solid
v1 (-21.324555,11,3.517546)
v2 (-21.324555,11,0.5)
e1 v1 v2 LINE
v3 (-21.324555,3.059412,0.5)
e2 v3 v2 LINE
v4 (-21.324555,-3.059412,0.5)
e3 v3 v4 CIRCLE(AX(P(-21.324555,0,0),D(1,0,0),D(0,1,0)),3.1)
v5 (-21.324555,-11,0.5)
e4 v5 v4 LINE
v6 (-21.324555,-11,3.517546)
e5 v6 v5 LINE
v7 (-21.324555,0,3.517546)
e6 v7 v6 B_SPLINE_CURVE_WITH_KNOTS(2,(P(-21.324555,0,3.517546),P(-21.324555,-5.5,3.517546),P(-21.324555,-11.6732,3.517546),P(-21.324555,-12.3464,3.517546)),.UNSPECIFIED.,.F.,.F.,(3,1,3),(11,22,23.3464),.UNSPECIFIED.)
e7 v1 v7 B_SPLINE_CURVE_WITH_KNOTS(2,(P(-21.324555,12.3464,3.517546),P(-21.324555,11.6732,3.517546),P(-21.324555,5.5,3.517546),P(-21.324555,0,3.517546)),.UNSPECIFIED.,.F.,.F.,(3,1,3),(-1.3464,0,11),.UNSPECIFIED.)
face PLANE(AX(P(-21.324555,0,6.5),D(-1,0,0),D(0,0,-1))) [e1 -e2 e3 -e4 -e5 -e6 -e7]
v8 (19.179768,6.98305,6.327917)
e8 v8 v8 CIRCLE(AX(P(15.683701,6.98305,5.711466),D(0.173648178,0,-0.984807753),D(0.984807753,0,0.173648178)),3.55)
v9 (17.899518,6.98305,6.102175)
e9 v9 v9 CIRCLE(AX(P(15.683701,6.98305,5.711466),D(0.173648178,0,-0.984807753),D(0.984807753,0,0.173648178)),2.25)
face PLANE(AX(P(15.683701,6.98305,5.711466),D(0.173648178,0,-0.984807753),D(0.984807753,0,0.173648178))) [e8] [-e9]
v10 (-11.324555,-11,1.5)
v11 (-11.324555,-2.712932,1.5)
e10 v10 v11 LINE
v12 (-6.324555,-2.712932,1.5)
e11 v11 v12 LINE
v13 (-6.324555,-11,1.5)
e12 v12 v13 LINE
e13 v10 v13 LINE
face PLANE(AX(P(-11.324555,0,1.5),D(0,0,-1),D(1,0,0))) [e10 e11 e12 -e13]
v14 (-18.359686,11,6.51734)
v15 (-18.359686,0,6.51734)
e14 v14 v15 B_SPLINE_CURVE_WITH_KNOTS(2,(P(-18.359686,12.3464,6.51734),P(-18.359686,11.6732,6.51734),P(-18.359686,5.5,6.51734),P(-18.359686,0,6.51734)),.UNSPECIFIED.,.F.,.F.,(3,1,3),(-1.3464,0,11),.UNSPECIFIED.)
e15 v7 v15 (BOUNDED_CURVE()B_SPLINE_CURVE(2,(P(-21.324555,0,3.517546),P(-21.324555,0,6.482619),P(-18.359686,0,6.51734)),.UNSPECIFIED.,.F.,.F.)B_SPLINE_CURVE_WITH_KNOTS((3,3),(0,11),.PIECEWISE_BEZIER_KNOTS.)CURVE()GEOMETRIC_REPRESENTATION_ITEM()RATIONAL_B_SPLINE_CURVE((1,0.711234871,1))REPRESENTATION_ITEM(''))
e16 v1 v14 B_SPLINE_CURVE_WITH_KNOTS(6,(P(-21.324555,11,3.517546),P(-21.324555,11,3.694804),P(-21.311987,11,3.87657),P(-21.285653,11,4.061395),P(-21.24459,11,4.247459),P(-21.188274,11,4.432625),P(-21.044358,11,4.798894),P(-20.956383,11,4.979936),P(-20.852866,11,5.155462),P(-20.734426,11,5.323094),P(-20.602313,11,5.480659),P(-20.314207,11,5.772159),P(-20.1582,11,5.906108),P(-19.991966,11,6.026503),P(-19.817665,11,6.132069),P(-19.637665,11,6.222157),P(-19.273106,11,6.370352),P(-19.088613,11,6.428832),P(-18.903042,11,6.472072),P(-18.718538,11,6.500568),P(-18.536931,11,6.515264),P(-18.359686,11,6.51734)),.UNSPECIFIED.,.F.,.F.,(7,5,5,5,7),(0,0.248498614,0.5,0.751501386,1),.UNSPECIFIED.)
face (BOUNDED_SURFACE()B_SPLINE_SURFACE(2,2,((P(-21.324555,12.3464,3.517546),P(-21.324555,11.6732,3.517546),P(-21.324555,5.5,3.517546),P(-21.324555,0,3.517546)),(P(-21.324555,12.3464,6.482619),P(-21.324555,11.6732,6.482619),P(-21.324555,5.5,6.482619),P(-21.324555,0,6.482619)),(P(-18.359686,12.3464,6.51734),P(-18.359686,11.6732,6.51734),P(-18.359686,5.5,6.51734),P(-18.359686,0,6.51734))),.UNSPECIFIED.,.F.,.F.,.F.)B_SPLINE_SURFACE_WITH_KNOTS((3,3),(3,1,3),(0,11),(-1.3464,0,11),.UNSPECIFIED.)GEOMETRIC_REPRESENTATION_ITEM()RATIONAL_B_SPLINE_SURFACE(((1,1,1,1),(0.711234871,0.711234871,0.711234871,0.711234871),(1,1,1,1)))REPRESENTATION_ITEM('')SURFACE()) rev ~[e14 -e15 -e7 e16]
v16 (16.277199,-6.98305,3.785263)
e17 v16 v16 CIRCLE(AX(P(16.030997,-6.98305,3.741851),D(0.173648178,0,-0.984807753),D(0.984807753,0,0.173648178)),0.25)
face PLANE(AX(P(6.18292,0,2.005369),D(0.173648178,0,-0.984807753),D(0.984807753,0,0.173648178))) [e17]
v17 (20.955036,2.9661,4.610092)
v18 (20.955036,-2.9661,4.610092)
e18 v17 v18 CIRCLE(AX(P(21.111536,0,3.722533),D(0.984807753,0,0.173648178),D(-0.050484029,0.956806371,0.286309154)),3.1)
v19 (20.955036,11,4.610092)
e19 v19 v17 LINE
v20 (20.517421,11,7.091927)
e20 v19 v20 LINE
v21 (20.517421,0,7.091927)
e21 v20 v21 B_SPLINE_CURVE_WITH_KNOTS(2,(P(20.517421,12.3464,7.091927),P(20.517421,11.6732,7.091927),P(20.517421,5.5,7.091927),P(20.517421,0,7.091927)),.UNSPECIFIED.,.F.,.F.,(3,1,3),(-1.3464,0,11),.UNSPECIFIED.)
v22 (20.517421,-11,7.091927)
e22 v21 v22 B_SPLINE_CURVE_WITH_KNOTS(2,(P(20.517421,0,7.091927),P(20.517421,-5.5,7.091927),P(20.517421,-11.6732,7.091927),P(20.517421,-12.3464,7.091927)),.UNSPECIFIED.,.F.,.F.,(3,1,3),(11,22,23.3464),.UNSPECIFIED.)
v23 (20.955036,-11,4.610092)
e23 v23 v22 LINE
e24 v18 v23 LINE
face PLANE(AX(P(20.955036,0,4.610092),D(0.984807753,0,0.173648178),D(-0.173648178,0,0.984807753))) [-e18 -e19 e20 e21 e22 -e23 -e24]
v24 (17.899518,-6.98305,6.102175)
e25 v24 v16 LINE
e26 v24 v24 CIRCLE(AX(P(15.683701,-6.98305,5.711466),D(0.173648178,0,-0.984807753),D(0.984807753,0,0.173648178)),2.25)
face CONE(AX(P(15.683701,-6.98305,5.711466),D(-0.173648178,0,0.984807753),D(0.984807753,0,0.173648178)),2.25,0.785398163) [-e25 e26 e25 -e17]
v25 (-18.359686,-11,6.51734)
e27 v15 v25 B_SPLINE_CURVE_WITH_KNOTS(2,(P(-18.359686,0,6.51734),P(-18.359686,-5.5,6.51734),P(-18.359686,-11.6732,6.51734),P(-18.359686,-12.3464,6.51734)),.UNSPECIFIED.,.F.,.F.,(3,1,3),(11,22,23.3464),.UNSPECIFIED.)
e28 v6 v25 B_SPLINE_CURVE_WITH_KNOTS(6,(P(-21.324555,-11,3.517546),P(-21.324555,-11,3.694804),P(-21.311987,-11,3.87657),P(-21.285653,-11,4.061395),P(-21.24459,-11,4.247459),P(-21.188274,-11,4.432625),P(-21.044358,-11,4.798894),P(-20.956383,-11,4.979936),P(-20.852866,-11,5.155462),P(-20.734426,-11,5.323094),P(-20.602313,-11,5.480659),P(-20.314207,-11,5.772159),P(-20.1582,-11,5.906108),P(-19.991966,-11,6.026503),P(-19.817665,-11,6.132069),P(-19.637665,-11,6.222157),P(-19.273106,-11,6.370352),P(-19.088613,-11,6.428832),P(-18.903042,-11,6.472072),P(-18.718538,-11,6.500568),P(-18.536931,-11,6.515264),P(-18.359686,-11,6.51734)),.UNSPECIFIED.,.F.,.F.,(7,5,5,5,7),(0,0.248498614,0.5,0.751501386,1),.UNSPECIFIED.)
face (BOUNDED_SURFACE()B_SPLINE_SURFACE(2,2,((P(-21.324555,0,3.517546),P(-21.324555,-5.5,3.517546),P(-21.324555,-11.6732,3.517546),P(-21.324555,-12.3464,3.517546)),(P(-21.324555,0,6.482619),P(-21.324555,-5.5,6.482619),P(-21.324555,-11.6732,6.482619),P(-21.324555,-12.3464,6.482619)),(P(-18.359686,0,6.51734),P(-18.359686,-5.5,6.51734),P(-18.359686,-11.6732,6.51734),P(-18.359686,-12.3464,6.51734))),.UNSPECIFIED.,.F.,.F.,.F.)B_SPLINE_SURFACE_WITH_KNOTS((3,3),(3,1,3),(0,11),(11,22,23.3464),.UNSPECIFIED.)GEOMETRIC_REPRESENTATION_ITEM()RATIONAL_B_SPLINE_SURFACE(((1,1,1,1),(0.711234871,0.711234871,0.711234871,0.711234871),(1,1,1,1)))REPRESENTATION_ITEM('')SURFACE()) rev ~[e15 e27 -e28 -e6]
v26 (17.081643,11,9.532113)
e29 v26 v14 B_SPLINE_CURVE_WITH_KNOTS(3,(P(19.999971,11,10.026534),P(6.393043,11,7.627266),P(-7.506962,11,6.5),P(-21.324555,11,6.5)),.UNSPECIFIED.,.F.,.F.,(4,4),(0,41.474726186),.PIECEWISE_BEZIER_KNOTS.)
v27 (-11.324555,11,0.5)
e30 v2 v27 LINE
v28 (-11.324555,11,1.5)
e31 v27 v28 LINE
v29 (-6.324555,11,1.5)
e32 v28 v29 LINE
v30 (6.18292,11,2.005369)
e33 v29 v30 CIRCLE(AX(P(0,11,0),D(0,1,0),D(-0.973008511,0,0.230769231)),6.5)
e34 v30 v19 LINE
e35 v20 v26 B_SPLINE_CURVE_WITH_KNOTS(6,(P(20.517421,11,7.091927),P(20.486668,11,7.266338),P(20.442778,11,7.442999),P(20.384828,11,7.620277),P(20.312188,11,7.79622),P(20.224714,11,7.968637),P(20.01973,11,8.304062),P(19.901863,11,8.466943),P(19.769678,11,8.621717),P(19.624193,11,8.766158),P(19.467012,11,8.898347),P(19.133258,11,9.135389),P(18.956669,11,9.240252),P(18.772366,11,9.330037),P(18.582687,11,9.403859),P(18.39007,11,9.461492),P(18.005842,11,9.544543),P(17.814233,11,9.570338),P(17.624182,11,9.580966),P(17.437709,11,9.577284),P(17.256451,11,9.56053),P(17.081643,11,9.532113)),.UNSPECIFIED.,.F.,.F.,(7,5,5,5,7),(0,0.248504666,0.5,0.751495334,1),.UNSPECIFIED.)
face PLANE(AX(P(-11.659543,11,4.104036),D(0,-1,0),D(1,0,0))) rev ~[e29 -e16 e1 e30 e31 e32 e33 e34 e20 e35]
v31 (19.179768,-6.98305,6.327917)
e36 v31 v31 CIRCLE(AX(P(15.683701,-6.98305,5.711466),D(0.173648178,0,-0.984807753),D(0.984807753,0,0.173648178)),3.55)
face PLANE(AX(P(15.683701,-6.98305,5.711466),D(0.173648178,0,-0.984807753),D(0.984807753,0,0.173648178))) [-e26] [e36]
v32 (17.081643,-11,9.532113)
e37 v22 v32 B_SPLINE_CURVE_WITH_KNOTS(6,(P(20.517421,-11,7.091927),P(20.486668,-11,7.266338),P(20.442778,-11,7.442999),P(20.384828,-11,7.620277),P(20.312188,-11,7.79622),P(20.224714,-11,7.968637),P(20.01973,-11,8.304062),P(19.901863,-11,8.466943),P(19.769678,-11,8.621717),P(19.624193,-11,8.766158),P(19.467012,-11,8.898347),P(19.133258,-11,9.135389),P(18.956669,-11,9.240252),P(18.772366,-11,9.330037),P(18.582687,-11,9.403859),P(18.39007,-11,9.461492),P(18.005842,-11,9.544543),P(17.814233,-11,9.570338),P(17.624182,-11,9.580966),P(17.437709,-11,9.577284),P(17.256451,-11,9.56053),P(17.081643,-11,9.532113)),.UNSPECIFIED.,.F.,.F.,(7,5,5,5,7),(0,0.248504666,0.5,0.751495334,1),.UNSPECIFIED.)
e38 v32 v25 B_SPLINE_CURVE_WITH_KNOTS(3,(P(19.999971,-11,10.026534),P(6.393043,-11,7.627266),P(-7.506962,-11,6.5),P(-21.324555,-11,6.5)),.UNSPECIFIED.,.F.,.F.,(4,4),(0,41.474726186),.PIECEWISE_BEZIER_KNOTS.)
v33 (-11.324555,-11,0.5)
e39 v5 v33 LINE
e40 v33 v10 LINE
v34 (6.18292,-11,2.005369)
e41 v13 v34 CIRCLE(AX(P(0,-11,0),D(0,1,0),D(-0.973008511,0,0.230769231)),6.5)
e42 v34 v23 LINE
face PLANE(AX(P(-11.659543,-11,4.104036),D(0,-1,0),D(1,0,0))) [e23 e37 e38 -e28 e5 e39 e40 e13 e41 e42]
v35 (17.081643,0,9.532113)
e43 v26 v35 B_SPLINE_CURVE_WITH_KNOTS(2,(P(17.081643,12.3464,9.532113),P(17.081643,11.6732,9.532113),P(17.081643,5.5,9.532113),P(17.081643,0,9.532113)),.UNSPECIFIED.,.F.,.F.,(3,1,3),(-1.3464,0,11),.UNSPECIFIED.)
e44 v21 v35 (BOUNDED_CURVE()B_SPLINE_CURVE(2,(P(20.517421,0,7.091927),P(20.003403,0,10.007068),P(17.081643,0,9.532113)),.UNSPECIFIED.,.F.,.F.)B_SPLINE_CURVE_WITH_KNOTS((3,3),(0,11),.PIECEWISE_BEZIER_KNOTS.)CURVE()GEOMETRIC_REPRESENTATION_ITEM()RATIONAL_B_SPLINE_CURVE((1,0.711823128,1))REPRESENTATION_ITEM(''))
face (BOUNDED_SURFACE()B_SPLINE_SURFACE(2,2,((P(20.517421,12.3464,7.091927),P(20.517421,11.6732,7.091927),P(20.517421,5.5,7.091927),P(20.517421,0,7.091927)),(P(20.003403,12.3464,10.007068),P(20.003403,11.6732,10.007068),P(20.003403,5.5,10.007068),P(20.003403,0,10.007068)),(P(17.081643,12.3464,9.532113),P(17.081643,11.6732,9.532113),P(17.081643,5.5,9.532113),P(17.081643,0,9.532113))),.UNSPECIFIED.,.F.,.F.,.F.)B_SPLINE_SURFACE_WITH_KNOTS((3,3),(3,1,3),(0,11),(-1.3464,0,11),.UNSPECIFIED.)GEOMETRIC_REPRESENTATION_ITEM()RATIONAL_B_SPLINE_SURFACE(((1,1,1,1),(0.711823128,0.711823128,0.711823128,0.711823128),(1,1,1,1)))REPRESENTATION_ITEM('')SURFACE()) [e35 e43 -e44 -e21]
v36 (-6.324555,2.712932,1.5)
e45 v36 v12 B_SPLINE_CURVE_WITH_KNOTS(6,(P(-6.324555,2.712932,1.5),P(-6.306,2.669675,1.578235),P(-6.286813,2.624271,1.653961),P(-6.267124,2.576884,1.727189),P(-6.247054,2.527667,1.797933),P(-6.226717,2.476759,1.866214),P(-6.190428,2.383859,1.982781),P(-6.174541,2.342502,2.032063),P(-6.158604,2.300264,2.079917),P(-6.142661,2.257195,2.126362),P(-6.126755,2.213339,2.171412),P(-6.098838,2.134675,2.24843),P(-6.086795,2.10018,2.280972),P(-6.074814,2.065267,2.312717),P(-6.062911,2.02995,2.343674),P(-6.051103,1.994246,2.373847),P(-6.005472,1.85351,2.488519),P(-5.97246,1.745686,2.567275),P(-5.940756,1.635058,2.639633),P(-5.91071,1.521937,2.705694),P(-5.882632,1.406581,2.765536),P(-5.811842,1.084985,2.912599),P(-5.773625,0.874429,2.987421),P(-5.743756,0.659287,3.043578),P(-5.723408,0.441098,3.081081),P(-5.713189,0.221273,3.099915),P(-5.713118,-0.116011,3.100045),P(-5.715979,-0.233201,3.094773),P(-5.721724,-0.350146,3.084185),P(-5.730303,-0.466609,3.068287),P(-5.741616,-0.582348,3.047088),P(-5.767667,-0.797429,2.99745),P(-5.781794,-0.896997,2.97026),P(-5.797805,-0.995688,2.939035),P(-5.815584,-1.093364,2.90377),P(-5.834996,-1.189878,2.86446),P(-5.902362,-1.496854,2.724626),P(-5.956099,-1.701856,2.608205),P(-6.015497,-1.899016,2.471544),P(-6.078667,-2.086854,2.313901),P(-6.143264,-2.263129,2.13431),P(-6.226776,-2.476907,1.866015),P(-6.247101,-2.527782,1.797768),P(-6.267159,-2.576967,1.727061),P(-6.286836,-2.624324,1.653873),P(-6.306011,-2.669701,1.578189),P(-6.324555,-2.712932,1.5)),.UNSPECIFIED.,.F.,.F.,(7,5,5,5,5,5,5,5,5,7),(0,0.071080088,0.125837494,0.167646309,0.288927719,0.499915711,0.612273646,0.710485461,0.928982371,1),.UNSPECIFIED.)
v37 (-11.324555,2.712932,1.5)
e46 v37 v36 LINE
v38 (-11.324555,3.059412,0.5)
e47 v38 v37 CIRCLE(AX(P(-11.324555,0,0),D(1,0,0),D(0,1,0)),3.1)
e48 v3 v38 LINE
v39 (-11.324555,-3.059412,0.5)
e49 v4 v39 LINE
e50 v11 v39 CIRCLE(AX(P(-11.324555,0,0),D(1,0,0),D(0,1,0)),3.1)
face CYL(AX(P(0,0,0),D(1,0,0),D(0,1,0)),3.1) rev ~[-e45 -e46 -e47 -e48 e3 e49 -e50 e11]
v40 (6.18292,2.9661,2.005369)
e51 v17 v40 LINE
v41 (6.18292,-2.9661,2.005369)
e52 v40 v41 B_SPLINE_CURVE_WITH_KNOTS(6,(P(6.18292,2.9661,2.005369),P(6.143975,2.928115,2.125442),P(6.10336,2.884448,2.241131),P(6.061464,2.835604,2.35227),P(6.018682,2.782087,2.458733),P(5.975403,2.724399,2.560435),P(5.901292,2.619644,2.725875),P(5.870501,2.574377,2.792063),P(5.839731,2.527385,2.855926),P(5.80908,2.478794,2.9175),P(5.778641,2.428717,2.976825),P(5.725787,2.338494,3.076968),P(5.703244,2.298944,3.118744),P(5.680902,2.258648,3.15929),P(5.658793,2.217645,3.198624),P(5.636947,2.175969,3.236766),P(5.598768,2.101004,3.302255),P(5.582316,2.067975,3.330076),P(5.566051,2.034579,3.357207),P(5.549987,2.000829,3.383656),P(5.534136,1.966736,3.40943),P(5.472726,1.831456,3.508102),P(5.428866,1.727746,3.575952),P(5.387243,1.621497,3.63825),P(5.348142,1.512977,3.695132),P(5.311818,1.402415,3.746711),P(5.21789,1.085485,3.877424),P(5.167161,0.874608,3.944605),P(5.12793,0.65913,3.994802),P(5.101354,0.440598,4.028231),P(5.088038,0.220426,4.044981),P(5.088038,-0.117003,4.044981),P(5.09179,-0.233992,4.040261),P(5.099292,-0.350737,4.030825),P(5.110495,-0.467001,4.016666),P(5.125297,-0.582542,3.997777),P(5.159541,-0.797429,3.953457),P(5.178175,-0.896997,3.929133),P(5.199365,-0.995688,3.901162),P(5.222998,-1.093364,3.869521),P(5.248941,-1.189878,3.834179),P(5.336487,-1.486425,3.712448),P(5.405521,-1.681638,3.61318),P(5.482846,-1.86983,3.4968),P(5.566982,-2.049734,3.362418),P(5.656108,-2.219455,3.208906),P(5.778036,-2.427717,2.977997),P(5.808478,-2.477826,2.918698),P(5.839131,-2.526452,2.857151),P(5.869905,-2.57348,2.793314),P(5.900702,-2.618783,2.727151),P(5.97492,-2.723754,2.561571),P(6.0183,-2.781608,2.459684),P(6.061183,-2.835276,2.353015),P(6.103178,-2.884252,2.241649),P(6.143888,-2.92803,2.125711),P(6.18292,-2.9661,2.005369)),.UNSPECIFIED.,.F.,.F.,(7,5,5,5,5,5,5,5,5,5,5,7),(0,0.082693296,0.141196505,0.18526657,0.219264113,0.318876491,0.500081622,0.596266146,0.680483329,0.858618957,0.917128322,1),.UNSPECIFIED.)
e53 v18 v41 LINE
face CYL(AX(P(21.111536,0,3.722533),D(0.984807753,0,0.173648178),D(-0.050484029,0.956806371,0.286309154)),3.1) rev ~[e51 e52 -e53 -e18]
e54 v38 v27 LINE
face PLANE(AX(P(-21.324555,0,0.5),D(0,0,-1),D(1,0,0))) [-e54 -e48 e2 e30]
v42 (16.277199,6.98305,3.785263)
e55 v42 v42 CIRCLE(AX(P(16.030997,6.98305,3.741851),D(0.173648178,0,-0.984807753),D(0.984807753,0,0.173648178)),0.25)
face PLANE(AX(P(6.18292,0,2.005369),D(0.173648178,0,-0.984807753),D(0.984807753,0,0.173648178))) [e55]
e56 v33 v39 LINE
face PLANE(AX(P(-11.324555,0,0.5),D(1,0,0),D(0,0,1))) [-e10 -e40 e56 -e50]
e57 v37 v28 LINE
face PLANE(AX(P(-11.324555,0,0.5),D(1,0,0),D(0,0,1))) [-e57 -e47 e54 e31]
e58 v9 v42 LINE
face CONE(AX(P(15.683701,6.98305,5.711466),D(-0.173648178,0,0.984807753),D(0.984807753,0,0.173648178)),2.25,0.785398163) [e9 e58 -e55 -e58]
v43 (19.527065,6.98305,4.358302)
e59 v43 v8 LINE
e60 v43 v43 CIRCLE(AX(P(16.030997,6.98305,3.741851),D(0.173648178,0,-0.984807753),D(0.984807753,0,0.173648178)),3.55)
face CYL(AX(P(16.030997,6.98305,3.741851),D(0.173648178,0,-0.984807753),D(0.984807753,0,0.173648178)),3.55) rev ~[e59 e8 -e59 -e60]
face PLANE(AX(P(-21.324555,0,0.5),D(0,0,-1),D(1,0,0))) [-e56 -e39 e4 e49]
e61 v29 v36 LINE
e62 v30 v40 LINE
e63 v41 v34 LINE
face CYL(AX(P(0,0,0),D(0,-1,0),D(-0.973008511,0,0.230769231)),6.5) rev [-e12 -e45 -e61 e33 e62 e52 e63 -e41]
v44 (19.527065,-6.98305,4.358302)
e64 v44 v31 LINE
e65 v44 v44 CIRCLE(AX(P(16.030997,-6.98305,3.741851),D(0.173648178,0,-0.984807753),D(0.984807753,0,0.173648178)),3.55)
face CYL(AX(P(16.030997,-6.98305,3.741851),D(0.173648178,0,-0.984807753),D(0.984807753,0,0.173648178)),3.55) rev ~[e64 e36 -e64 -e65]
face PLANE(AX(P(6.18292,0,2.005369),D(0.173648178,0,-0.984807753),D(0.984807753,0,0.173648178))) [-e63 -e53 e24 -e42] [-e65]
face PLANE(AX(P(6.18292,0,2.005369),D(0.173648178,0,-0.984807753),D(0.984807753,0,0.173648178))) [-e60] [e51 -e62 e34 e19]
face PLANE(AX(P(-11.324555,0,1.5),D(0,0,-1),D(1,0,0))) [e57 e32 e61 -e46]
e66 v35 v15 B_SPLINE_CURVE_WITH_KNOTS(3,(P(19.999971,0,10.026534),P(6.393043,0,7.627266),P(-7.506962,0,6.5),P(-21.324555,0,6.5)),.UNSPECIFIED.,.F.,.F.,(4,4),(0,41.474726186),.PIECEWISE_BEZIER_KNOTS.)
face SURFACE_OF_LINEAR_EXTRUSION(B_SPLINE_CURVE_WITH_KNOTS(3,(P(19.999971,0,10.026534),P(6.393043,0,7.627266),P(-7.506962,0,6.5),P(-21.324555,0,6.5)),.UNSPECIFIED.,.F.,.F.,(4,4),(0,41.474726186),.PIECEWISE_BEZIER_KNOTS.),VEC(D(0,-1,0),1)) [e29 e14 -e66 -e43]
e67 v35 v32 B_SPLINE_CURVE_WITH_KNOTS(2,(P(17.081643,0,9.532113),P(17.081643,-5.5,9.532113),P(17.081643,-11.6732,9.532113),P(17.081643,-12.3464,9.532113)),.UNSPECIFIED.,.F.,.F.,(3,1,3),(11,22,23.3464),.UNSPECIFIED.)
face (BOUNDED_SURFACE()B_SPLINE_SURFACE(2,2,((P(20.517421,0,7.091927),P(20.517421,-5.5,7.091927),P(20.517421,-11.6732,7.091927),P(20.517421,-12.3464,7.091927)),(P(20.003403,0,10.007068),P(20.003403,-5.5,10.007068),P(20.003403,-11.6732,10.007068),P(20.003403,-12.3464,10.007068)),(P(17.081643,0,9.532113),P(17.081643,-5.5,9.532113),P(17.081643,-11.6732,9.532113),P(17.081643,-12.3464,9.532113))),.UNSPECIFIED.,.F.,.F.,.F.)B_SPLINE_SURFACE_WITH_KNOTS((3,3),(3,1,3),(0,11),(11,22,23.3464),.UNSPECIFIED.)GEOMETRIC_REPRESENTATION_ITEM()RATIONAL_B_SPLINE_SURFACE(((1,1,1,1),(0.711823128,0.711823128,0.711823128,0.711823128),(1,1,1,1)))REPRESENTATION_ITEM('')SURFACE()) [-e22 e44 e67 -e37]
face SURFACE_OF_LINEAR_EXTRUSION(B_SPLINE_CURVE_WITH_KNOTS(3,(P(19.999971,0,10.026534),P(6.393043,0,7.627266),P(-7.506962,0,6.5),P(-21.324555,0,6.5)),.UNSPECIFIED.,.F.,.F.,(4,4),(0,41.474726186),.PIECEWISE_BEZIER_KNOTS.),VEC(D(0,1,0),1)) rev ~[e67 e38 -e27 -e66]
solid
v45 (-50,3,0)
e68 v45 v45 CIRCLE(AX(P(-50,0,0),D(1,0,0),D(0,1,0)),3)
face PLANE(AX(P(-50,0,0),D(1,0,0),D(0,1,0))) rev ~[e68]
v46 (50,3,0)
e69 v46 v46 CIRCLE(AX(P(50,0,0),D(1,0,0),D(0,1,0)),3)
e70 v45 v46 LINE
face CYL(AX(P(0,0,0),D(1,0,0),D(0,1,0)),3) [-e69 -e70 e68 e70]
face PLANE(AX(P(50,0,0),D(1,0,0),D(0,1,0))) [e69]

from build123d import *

# Parameters (mm, degrees)
F1_DEPTH = 11
F2_R     = 3.1
F3_DEPTH = 30
F5_DEPTH = 60
F6_R     = 3
F7_DEPTH = 50
F8_R     = 3.55
F8_R_2   = 2.25
F9_DEPTH = 2
F11_R    = 3


# Not quite as in the source:
# - a fillet or chamfer that OpenCascade refuses, or shapes differently, is made with other operations: its cross-section is extruded or revolved along the edge and cut away or added


with BuildPart() as f1:
    # F0 (on Front) → F1 (new body, symmetric)
    with BuildSketch(Plane.XZ):
        with BuildLine():
            Line((-11.3245553203, 1.5), (-6.3245553203, 1.5))
            ThreePointArc((-6.3245553203, 1.5), (-4.0311288741, 5.0990195136), (0, 6.5))
            Line((0, 6.5), (-21.3245553203, 6.5))
            Line((-21.3245553203, 6.5), (-21.3245553203, 0.5))
            Line((-21.3245553203, 0.5), (-11.3245553203, 0.5))
            Line((-11.3245553203, 0.5), (-11.3245553203, 1.5))
        make_face()
        with BuildLine():
            ThreePointArc((0, 6.5), (3.8219824935, 5.2576087549), (6.182919575, 2.0053691753))
            Line((6.182919575, 2.0053691753), (20.9550358702, 4.6100918403))
            Line((20.9550358702, 4.6100918403), (19.999970893, 10.0265344818))
            Line((19.999970893, 10.0265344818), (0, 6.5))
        make_face()
        with BuildLine():
            Line((-21.3245553203, 6.5), (0, 6.5))
            Line((0, 6.5), (19.999970893, 10.0265344818))
            add(Edge.make_bspline(
                [(19.999970893, 10.0265344818), (6.3930427733, 7.6272659298), (-7.5069618116, 6.5), (-21.3245553203, 6.5)],
                knots=[0, 0, 0, 0, 41.4747261861, 41.4747261861, 41.4747261861, 41.4747261861], degree=3))
        make_face()
    extrude(amount=F1_DEPTH, both=True)

    # F2 (on Right) → F3 (cut, symmetric)
    with BuildSketch(Plane.YZ):
        Circle(F2_R)
    extrude(amount=F3_DEPTH, both=True, mode=Mode.SUBTRACT)

    # F4 (on face) → F5 (cut)
    with BuildSketch(Plane(origin=(21.1115363588, 0, 3.7225334643), x_dir=(0, 1, 0), z_dir=(0.984807753, 0, 0.1736481777))):
        with BuildLine():
            Line((-2.9660997499, 0.9012503946), (2.9660997499, 0.9012503946))
            ThreePointArc((2.9660997499, 0.9012503946), (0, 3.1), (-2.9660997499, 0.9012503946))
        make_face()
        with BuildLine():
            ThreePointArc((-2.9660997499, 0.9012503946), (-0.4555714957, -3.0663422204), (3.1, 0))
            ThreePointArc((3.1, 0), (3.0663422204, 0.4555714957), (2.9660997499, 0.9012503946))
            Line((2.9660997499, 0.9012503946), (-2.9660997499, 0.9012503946))
        make_face()
    extrude(amount=-F5_DEPTH, mode=Mode.SUBTRACT)

    # F8 (on face) → F9 (cut)
    with BuildSketch(Plane(origin=(-0.1565004886, 0, 0.887558376), x_dir=(0.984807753, 0, 0.1736481777), z_dir=(0.1736481777, 0, -0.984807753))):
        with Locations((16.4372158365, 6.9830498749)):
            Circle(F8_R)
        with Locations((16.4372158365, 6.9830498749)):
            Circle(F8_R_2, mode=Mode.SUBTRACT)
        with Locations((16.4372158365, -6.9830498749)):
            Circle(F8_R)
        with Locations((16.4372158365, -6.9830498749)):
            Circle(F8_R_2, mode=Mode.SUBTRACT)
    extrude(amount=-F9_DEPTH, mode=Mode.SUBTRACT)

    # F10: chamfer of 2 on 2 edges, made by hand


with BuildPart() as f7:
    # F6 (on Right) → F7 (new body, symmetric)
    with BuildSketch(Plane.YZ):
        Circle(F6_R)
    extrude(amount=F7_DEPTH, both=True)


with BuildPart() as f10_tool2:
    # F10_s3 → F10_t4 (revolve)
    with BuildSketch(Plane.XZ.offset(6.9830498749)):
        Polygon((17.8995181941, 6.1021748577), (16.2771990434, 3.7852629963), (18.2468145494, 4.1325593517), align=None)
    revolve(axis=Axis((16.0309971051, -6.9830498749, 3.7418509519), (0.1736481777, 0, -0.984807753)))

    split(bisect_by=Plane(origin=(-0.503796844, 0, 2.857173882), x_dir=(0, 1, 0), z_dir=(0.1736481777, 0, -0.984807753)), keep=Keep.TOP)


with BuildPart() as f1_1:
    add(f1.part)

    # F10_t1: cut F10_tool2
    add(f10_tool2.part, mode=Mode.SUBTRACT)


with BuildPart() as f10_tool7:
    # F10_s8 → F10_t9 (revolve)
    with BuildSketch(Plane.XZ.offset(-6.9830498749)):
        Polygon((17.8995181941, 6.1021748577), (16.2771990434, 3.7852629963), (18.2468145494, 4.1325593517), align=None)
    revolve(axis=Axis((16.0309971051, 6.9830498749, 3.7418509519), (0.1736481777, 0, -0.984807753)))

    split(bisect_by=Plane(origin=(-0.503796844, 0, 2.857173882), x_dir=(0, 1, 0), z_dir=(0.1736481777, 0, -0.984807753)), keep=Keep.TOP)


with BuildPart() as f1_2:
    add(f1_1.part)

    # F10_t6: cut F10_tool7
    add(f10_tool7.part, mode=Mode.SUBTRACT)

    # F11
    f11_edges = [f1_2.edges().sort_by_distance(p)[0] for p in [
        (19.999971, -5.5, 10.026534),
        (19.999971, 5.5, 10.026534),
        (-21.324555, -5.5, 6.5),
        (-21.324555, 5.5, 6.5),
    ]]
    fillet(f11_edges, radius=F11_R)


solid = Compound([f7.part, f1_2.part])
